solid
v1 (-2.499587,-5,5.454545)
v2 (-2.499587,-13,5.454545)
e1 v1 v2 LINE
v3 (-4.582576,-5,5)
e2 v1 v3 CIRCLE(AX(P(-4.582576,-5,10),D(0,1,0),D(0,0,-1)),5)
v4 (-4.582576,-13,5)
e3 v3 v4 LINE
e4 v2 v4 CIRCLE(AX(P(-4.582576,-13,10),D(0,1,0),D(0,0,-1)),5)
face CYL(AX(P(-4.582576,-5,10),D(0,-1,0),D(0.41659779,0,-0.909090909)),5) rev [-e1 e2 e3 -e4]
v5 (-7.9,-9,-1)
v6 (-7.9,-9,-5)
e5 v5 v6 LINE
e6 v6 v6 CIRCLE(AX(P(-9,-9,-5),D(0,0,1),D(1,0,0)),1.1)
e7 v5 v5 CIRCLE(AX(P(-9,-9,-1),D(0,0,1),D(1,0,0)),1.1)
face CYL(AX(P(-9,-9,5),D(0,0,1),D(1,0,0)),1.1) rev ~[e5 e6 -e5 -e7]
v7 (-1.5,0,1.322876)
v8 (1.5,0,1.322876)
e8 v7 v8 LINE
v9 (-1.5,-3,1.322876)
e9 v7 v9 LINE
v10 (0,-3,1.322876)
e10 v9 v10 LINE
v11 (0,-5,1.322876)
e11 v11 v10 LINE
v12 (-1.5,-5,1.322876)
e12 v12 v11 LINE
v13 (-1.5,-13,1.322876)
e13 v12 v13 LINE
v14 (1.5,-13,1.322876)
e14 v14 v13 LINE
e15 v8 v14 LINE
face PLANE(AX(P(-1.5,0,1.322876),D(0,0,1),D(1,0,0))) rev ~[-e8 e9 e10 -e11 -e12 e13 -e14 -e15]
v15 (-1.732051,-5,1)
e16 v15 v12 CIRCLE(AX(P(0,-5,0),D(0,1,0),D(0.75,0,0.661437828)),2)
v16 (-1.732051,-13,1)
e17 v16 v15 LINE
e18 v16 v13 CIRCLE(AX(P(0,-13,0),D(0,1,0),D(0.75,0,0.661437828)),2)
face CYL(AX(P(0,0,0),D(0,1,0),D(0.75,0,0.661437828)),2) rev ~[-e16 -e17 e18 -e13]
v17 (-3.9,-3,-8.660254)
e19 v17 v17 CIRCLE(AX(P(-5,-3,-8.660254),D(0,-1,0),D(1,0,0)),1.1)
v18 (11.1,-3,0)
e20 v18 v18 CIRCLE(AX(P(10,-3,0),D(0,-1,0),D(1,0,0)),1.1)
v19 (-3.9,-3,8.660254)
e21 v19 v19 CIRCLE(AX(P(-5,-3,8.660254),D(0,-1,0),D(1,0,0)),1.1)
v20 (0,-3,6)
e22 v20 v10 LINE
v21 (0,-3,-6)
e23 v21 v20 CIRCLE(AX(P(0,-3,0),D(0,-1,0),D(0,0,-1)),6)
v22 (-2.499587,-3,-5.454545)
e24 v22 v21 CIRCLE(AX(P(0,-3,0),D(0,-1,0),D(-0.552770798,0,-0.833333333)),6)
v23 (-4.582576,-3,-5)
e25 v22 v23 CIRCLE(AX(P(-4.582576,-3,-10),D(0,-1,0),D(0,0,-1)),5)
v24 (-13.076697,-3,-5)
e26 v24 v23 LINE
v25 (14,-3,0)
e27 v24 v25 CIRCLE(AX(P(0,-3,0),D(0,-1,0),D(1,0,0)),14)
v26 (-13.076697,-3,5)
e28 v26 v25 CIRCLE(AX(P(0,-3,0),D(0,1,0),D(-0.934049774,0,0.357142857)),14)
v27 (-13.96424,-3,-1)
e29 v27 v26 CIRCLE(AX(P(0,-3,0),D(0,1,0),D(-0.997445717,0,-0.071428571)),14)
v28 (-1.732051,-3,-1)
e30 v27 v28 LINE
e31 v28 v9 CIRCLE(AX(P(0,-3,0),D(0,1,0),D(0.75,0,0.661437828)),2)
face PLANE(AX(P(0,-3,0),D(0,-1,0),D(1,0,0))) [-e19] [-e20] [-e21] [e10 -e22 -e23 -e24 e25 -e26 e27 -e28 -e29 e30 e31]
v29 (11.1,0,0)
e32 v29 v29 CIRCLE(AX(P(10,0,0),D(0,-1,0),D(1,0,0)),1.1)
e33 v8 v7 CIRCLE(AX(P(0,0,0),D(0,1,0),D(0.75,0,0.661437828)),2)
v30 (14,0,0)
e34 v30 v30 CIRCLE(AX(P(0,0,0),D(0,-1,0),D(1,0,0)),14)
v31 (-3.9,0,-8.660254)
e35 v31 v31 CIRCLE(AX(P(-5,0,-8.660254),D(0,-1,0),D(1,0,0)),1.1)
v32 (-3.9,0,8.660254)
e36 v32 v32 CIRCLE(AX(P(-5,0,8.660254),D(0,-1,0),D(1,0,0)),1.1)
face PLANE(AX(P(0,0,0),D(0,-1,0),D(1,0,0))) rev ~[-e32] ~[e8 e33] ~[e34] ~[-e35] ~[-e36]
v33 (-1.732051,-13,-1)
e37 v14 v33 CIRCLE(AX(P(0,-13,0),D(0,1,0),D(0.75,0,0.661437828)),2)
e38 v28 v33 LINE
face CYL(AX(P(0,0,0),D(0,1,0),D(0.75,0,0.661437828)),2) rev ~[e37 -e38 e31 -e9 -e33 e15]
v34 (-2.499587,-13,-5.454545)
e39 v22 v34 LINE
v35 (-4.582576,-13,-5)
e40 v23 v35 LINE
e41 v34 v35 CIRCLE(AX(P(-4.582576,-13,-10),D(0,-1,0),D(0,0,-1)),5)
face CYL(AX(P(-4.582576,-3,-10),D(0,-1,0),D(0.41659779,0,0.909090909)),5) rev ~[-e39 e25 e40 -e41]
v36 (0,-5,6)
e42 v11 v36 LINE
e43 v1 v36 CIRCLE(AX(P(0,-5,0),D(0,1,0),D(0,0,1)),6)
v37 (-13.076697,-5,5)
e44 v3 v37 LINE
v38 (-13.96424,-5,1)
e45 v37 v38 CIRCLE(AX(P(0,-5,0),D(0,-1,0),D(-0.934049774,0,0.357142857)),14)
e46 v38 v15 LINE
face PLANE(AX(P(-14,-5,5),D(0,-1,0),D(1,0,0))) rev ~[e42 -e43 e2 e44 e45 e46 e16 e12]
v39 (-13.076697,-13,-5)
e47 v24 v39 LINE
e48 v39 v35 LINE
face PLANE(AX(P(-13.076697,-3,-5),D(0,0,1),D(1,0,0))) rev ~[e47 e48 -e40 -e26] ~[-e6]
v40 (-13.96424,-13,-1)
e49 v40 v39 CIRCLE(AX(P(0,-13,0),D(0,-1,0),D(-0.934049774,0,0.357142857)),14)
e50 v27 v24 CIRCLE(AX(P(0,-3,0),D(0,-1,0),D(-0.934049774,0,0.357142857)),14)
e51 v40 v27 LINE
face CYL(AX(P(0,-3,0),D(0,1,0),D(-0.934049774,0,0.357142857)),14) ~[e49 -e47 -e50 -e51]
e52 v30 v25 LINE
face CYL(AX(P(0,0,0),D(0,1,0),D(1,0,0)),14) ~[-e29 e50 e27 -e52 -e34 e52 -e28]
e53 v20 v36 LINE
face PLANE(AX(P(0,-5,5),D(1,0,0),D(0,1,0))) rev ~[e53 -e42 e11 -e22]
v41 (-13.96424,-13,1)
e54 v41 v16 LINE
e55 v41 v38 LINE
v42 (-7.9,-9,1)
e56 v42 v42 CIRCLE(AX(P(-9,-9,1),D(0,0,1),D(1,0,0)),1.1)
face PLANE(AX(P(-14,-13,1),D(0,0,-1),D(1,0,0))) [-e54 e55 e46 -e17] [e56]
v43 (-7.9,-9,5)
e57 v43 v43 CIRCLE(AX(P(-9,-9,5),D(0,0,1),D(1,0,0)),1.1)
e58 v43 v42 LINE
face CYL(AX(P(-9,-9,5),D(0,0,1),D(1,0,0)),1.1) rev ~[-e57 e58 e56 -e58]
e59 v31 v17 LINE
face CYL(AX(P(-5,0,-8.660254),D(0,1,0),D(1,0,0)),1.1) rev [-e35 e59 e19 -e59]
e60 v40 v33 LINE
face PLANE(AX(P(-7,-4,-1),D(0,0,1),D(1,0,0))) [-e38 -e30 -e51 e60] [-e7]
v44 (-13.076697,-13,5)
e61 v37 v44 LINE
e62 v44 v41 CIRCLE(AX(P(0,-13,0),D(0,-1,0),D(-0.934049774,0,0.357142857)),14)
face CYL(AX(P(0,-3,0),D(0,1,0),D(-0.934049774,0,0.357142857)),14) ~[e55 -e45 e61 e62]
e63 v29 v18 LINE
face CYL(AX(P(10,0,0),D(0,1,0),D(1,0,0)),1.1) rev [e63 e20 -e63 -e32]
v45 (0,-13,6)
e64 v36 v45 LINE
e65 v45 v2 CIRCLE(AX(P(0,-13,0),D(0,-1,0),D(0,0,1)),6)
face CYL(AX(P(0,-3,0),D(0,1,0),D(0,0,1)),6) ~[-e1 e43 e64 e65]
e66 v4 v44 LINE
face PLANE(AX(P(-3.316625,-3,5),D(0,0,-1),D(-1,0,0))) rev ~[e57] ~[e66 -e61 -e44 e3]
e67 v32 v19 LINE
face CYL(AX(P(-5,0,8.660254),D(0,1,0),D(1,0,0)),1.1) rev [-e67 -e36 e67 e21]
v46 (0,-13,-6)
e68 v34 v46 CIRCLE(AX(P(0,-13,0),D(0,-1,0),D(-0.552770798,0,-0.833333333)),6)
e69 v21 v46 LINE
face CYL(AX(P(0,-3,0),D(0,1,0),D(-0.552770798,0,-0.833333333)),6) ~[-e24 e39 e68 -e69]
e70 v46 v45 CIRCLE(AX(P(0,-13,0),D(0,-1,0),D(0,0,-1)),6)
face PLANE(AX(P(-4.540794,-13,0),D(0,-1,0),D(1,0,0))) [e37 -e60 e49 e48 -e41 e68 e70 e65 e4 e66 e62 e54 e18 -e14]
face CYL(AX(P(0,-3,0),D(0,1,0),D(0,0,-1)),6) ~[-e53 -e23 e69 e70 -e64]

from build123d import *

# Parameters (mm, degrees)
F0_R      = 14
F0_R_2    = 1.1
F1_DEPTH  = 3
F3_DEPTH  = 10
F5_DEPTH  = 13.001
F6_W      = 14
F6_H      = 2
F7_DEPTH  = 6
F8_W      = 14
F8_H      = 2
F9_DEPTH  = 8
F10_R     = 3
F11_DEPTH = 10
F12_R     = 5
F13_R     = 5
F14_R     = 1.1
F15_DEPTH = 19.001


# Not quite as in the source:
# - a feature names something its author has since deleted; it is built from what else it names


with BuildPart() as f1:
    # F0 (on Front) → F1 (new body)
    with BuildSketch(Plane.XZ):
        Circle(F0_R)
        with Locations((-5, -8.6602540378)):
            Circle(F0_R_2, mode=Mode.SUBTRACT)
        with Locations((-5, 8.6602540378)):
            Circle(F0_R_2, mode=Mode.SUBTRACT)
        with Locations((10, 0)):
            Circle(F0_R_2, mode=Mode.SUBTRACT)
    extrude(amount=F1_DEPTH)

    # F2 (on face) → F3 (join)
    with BuildSketch(Plane.XZ.offset(3)):
        with BuildLine():
            ThreePointArc((-3.3166247904, -5), (-1.7320508076, -5.7445626465), (0, -6))
            ThreePointArc((0, -6), (6, 0), (0, 6))
            ThreePointArc((0, 6), (-1.7320508076, 5.7445626465), (-3.3166247904, 5))
            Line((-3.3166247904, 5), (-13.0766968306, 5))
            ThreePointArc((-13.0766968306, 5), (-14, 0), (-13.0766968306, -5))
            Line((-13.0766968306, -5), (-3.3166247904, -5))
        make_face()
    extrude(amount=F3_DEPTH)

    # F4 (on face) → F5 (cut, through all)
    with BuildSketch(Plane(origin=(0, 0, 0), x_dir=(-1, 0, 0), z_dir=(0, 1, 0))):
        with BuildLine():
            Line((1.5, 1.3228756555), (-1.5, 1.3228756555))
            ThreePointArc((-1.5, 1.3228756555), (0, -2), (1.5, 1.3228756555))
        make_face()
    extrude(amount=-F5_DEPTH, mode=Mode.SUBTRACT)

    # F6 (on face) → F7 (cut, symmetric)
    with BuildSketch(Plane.XY.offset(5)):
        with Locations((-7, -4)):
            Rectangle(F6_W, F6_H)
    extrude(amount=F7_DEPTH, both=True, mode=Mode.SUBTRACT)

    # F8 (on face) → F9 (cut)
    with BuildSketch(Plane.XZ.offset(13)):
        with Locations((-7, 0)):
            Rectangle(F8_W, F8_H)
    extrude(amount=-F9_DEPTH, mode=Mode.SUBTRACT)

    # F10 (on face) → F11 (cut)
    with BuildSketch(Plane.XZ.offset(3)):
        with Locations((-5, 8.6602540378)):
            Circle(F10_R)
    extrude(amount=F11_DEPTH, mode=Mode.SUBTRACT)

    # F12
    f12_edges = [f1.edges().sort_by_distance(p)[0] for p in [
        (-3.316625, -9, 5),
    ]]
    fillet(f12_edges, radius=F12_R)

    # F13
    f13_edges = [f1.edges().sort_by_distance(p)[0] for p in [
        (-3.316625, -8, -5),
    ]]
    fillet(f13_edges, radius=F13_R)

    # F14 (on face) → F15 (cut, through all)
    with BuildSketch(Plane.XY.offset(5)):
        with Locations((-9, -9)):
            Circle(F14_R)
    extrude(amount=-F15_DEPTH, mode=Mode.SUBTRACT)


solid = f1.part
